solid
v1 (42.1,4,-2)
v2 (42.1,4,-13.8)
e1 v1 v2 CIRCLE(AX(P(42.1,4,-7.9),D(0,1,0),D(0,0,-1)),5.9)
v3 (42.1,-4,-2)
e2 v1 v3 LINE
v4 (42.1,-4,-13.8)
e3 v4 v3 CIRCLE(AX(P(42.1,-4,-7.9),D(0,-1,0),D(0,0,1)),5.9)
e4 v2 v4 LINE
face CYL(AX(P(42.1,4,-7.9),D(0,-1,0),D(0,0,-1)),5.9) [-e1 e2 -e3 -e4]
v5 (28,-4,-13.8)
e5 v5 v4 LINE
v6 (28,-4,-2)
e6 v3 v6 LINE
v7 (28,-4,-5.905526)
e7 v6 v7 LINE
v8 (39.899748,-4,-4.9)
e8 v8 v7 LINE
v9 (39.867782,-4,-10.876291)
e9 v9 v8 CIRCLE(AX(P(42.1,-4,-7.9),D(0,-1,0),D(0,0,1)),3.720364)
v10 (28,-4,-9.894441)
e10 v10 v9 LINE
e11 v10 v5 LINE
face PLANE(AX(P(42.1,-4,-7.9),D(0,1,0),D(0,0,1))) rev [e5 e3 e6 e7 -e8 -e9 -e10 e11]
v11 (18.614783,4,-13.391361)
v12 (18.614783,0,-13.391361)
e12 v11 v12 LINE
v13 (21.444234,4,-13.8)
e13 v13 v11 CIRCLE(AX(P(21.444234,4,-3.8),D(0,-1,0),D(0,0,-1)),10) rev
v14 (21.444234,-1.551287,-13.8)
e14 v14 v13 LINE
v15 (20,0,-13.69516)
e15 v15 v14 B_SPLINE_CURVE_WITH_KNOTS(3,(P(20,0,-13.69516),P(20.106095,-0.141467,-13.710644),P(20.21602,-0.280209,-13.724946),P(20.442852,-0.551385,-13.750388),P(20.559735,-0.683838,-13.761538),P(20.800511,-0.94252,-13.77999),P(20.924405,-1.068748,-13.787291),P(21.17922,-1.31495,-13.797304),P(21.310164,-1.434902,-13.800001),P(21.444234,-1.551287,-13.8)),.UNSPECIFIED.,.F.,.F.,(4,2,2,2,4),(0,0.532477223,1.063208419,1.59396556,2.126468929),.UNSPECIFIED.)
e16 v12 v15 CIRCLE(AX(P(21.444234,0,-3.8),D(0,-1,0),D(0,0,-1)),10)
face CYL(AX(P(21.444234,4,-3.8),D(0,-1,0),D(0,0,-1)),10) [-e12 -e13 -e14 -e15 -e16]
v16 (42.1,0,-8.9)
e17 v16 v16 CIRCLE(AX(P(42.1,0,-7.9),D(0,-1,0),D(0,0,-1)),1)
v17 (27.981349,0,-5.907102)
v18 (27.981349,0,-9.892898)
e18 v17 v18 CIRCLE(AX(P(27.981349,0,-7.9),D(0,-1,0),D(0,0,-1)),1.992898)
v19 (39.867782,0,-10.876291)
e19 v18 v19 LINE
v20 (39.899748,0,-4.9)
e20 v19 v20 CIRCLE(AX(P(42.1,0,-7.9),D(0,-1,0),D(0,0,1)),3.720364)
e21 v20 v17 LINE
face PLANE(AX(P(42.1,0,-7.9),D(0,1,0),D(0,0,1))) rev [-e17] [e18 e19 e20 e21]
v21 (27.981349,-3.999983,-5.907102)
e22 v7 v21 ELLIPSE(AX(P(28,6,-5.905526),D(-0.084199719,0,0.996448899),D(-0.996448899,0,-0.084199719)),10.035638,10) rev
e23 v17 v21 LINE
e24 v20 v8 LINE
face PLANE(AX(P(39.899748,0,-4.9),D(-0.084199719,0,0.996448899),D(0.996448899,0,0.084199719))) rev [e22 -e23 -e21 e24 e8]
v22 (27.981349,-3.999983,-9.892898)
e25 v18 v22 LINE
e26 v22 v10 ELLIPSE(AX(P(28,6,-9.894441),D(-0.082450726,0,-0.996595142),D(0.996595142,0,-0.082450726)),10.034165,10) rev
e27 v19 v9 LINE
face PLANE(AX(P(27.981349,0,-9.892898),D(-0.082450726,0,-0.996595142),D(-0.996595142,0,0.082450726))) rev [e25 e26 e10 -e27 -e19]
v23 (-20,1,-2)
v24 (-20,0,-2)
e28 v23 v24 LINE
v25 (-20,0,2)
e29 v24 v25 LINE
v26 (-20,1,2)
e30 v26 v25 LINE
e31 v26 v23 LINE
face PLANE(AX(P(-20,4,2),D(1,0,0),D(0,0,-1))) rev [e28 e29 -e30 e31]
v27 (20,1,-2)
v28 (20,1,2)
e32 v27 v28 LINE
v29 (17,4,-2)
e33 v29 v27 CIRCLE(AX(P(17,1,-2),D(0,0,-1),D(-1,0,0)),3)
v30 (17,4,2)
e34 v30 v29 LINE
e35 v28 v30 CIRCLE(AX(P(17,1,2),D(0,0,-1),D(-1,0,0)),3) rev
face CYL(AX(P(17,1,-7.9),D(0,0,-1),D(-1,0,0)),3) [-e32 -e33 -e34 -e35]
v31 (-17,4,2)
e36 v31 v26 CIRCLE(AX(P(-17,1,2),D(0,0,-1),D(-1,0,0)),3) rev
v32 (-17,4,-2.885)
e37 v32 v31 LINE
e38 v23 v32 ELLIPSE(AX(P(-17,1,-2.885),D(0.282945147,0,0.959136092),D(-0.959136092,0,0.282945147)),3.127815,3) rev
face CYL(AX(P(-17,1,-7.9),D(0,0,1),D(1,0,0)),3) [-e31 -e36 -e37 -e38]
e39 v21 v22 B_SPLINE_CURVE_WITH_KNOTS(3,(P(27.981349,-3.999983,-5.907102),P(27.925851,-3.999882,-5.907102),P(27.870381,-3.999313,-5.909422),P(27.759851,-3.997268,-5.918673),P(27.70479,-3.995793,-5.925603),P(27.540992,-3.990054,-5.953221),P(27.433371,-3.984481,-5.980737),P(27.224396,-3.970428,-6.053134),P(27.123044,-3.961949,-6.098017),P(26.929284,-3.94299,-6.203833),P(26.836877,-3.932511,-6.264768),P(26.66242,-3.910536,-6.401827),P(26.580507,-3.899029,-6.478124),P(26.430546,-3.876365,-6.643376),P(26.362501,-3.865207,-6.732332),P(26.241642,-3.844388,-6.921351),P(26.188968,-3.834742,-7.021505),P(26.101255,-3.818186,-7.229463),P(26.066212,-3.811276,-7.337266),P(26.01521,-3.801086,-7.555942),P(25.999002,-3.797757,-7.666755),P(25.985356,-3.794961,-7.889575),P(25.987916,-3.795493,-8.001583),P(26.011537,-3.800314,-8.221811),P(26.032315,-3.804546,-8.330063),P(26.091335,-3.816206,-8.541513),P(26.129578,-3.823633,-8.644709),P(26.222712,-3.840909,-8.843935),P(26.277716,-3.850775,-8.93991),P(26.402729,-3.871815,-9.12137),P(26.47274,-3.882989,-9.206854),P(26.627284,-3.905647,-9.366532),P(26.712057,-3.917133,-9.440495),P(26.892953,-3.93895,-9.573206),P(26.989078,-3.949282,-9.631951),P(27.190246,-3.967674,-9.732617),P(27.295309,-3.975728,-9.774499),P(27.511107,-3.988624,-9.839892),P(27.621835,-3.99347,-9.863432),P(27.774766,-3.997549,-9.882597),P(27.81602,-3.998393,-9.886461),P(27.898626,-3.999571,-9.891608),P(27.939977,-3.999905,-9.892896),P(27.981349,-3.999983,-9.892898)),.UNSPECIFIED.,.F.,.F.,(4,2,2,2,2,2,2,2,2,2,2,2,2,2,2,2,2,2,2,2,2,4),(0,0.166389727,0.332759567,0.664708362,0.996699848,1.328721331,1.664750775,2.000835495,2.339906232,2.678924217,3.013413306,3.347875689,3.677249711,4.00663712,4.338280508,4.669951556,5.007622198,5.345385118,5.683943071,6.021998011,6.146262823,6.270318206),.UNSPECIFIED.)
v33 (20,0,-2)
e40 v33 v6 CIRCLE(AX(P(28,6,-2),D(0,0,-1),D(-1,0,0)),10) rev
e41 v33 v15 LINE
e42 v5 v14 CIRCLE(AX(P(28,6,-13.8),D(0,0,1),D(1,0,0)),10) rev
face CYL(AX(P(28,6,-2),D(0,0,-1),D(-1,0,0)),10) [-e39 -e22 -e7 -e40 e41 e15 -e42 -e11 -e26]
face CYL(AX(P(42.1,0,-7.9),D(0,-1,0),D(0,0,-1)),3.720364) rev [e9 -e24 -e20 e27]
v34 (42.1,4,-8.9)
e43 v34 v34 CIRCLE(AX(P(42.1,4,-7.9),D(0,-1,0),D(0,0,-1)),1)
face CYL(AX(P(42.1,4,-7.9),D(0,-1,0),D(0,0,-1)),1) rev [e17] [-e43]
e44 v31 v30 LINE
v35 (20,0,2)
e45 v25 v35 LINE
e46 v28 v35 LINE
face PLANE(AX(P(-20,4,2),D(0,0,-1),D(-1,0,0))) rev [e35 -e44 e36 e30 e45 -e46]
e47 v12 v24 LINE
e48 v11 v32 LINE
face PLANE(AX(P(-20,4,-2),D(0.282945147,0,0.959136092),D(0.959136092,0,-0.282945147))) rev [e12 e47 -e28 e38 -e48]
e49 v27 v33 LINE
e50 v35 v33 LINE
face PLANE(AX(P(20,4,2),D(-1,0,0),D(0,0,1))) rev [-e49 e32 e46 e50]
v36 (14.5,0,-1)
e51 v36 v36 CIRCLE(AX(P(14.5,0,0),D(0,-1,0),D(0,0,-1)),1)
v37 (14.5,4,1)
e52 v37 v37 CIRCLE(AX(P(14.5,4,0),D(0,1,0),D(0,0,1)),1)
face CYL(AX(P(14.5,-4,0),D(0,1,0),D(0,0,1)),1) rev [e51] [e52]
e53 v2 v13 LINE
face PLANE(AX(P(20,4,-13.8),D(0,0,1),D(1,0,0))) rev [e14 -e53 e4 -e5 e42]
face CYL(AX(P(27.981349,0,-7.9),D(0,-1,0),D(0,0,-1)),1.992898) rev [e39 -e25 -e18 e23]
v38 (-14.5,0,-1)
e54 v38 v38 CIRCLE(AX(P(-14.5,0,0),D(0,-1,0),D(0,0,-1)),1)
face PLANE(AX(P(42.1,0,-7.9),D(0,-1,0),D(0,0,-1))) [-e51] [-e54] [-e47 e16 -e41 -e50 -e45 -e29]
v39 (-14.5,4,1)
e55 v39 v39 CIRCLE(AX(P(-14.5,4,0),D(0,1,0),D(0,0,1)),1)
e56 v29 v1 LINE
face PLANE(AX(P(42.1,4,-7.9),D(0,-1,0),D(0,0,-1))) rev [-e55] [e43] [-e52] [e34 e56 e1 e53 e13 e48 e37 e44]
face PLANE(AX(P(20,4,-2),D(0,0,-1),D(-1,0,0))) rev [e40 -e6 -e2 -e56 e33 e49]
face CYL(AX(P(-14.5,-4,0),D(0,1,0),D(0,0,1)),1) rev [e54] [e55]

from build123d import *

# Parameters (mm, degrees)
BOSS_EXTRUDE2_DEPTH = 4
BOSS_EXTRUDE3_START = 4
BOSS_EXTRUDE3_DEPTH = 4
CUT_EXTRUDE1_DEPTH  = 4
SKETCH7_R           = 1
CUT_EXTRUDE2_DEPTH  = 51.104291233
SKETCH9_R           = 1
CUT_EXTRUDE8_DEPTH  = 51.58102411
FILLET1_R           = 10
FILLET2_R           = 10
FILLET3_R           = 3


with BuildPart() as part:
    # Sketch1 → Boss-Extrude2 (new body)
    with BuildSketch(Plane(origin=(0, 0, 0), x_dir=(1, 0, 0), z_dir=(0, 1, 0))):
        with BuildLine():
            Line((-20, 2), (20, 13.8))
            Line((20, 13.8), (42.1, 13.8))
            ThreePointArc((42.1, 13.8), (48, 7.9), (42.1, 2))
            Line((42.1, 2), (20, 2))
            Line((20, 2), (20, -2))
            Line((20, -2), (-20, -2))
            Line((-20, -2), (-20, 2))
        make_face()
    extrude(amount=BOSS_EXTRUDE2_DEPTH)

    # Sketch4 → Boss-Extrude3 (add)
    with BuildSketch(Plane(origin=(0, 0, 0), x_dir=(-1, 0, 0), z_dir=(0, -1, 0)).offset(BOSS_EXTRUDE3_START)):
        with BuildLine():
            Line((-20, 2), (-42.1, 2))
            ThreePointArc((-42.1, 2), (-48, 7.9), (-42.1, 13.8))
            Line((-42.1, 13.8), (-20, 13.8))
            Line((-20, 13.8), (-20, 2))
        make_face()
    extrude(amount=-BOSS_EXTRUDE3_DEPTH)

    # Sketch6 → Cut-Extrude1 (cut)
    with BuildSketch(Plane.XZ.offset(4)):
        with BuildLine():
            Line((39.899748285, -4.9), (27.981348848, -5.907102203))
            ThreePointArc((27.981348848, -5.907102203), (25.988451051, -7.9), (27.981348848, -9.892897797))
            Line((27.981348848, -9.892897797), (39.867781655, -10.876291126))
            ThreePointArc((39.867781655, -10.876291126), (45.820310688, -7.919899599), (39.899748285, -4.9))
        make_face()
    extrude(amount=-CUT_EXTRUDE1_DEPTH, mode=Mode.SUBTRACT)

    # Sketch7 → Cut-Extrude2 (cut, through all)
    with BuildSketch(Plane.XZ):
        with Locations(Location((42.1, -7.9, 0), (0, 0, 270))):
            Circle(SKETCH7_R)
    extrude(amount=-CUT_EXTRUDE2_DEPTH, mode=Mode.SUBTRACT)

    # Sketch9 → Cut-Extrude8 (cut, through all)
    with BuildSketch(Plane(origin=(0, 4, 0), x_dir=(1, 0, 0), z_dir=(0, 1, 0))):
        with Locations(Location((-14.5, 0, 0), (0, 0, 270))):
            Circle(SKETCH9_R)
        with Locations(Location((14.5, 0, 0), (0, 0, 270))):
            Circle(SKETCH9_R)
    extrude(amount=-CUT_EXTRUDE8_DEPTH, mode=Mode.SUBTRACT)

    # Fillet1
    # the kernel refuses this fillet: 10 mm, written as the material it takes off along each edge
    with BuildSketch(Plane(origin=(20, -4, -33.8), x_dir=(1, 0, 0), z_dir=(0, 0, 1))) as fillet1_piece_1:
        with BuildLine():
            CenterArc((8, 10), FILLET1_R, 216.869897646, 53.130102354)
            Line((0, 4), (-0.16, 3.88))
            ThreePointArc((-0.16, 3.88), (-0.2, 2), (-0.2, 0))
            Line((-0.2, 0), (0, -0.2))
            Line((0, -0.2), (8, -0.2))
            Line((8, -0.2), (8, 0))
        make_face()
    extrude(amount=51.8, mode=Mode.SUBTRACT)

    # Fillet2
    fillet2_edges = [part.edges().sort_by_distance(p)[0] for p in [
        (20, 2, -13.8),
    ]]
    fillet(fillet2_edges, radius=FILLET2_R)

    # Fillet3
    fillet3_edges = [part.edges().sort_by_distance(p)[0] for p in [
        (-20, 4, 0),
        (20, 4, 0),
    ]]
    fillet(fillet3_edges, radius=FILLET3_R)


solid = part.part
